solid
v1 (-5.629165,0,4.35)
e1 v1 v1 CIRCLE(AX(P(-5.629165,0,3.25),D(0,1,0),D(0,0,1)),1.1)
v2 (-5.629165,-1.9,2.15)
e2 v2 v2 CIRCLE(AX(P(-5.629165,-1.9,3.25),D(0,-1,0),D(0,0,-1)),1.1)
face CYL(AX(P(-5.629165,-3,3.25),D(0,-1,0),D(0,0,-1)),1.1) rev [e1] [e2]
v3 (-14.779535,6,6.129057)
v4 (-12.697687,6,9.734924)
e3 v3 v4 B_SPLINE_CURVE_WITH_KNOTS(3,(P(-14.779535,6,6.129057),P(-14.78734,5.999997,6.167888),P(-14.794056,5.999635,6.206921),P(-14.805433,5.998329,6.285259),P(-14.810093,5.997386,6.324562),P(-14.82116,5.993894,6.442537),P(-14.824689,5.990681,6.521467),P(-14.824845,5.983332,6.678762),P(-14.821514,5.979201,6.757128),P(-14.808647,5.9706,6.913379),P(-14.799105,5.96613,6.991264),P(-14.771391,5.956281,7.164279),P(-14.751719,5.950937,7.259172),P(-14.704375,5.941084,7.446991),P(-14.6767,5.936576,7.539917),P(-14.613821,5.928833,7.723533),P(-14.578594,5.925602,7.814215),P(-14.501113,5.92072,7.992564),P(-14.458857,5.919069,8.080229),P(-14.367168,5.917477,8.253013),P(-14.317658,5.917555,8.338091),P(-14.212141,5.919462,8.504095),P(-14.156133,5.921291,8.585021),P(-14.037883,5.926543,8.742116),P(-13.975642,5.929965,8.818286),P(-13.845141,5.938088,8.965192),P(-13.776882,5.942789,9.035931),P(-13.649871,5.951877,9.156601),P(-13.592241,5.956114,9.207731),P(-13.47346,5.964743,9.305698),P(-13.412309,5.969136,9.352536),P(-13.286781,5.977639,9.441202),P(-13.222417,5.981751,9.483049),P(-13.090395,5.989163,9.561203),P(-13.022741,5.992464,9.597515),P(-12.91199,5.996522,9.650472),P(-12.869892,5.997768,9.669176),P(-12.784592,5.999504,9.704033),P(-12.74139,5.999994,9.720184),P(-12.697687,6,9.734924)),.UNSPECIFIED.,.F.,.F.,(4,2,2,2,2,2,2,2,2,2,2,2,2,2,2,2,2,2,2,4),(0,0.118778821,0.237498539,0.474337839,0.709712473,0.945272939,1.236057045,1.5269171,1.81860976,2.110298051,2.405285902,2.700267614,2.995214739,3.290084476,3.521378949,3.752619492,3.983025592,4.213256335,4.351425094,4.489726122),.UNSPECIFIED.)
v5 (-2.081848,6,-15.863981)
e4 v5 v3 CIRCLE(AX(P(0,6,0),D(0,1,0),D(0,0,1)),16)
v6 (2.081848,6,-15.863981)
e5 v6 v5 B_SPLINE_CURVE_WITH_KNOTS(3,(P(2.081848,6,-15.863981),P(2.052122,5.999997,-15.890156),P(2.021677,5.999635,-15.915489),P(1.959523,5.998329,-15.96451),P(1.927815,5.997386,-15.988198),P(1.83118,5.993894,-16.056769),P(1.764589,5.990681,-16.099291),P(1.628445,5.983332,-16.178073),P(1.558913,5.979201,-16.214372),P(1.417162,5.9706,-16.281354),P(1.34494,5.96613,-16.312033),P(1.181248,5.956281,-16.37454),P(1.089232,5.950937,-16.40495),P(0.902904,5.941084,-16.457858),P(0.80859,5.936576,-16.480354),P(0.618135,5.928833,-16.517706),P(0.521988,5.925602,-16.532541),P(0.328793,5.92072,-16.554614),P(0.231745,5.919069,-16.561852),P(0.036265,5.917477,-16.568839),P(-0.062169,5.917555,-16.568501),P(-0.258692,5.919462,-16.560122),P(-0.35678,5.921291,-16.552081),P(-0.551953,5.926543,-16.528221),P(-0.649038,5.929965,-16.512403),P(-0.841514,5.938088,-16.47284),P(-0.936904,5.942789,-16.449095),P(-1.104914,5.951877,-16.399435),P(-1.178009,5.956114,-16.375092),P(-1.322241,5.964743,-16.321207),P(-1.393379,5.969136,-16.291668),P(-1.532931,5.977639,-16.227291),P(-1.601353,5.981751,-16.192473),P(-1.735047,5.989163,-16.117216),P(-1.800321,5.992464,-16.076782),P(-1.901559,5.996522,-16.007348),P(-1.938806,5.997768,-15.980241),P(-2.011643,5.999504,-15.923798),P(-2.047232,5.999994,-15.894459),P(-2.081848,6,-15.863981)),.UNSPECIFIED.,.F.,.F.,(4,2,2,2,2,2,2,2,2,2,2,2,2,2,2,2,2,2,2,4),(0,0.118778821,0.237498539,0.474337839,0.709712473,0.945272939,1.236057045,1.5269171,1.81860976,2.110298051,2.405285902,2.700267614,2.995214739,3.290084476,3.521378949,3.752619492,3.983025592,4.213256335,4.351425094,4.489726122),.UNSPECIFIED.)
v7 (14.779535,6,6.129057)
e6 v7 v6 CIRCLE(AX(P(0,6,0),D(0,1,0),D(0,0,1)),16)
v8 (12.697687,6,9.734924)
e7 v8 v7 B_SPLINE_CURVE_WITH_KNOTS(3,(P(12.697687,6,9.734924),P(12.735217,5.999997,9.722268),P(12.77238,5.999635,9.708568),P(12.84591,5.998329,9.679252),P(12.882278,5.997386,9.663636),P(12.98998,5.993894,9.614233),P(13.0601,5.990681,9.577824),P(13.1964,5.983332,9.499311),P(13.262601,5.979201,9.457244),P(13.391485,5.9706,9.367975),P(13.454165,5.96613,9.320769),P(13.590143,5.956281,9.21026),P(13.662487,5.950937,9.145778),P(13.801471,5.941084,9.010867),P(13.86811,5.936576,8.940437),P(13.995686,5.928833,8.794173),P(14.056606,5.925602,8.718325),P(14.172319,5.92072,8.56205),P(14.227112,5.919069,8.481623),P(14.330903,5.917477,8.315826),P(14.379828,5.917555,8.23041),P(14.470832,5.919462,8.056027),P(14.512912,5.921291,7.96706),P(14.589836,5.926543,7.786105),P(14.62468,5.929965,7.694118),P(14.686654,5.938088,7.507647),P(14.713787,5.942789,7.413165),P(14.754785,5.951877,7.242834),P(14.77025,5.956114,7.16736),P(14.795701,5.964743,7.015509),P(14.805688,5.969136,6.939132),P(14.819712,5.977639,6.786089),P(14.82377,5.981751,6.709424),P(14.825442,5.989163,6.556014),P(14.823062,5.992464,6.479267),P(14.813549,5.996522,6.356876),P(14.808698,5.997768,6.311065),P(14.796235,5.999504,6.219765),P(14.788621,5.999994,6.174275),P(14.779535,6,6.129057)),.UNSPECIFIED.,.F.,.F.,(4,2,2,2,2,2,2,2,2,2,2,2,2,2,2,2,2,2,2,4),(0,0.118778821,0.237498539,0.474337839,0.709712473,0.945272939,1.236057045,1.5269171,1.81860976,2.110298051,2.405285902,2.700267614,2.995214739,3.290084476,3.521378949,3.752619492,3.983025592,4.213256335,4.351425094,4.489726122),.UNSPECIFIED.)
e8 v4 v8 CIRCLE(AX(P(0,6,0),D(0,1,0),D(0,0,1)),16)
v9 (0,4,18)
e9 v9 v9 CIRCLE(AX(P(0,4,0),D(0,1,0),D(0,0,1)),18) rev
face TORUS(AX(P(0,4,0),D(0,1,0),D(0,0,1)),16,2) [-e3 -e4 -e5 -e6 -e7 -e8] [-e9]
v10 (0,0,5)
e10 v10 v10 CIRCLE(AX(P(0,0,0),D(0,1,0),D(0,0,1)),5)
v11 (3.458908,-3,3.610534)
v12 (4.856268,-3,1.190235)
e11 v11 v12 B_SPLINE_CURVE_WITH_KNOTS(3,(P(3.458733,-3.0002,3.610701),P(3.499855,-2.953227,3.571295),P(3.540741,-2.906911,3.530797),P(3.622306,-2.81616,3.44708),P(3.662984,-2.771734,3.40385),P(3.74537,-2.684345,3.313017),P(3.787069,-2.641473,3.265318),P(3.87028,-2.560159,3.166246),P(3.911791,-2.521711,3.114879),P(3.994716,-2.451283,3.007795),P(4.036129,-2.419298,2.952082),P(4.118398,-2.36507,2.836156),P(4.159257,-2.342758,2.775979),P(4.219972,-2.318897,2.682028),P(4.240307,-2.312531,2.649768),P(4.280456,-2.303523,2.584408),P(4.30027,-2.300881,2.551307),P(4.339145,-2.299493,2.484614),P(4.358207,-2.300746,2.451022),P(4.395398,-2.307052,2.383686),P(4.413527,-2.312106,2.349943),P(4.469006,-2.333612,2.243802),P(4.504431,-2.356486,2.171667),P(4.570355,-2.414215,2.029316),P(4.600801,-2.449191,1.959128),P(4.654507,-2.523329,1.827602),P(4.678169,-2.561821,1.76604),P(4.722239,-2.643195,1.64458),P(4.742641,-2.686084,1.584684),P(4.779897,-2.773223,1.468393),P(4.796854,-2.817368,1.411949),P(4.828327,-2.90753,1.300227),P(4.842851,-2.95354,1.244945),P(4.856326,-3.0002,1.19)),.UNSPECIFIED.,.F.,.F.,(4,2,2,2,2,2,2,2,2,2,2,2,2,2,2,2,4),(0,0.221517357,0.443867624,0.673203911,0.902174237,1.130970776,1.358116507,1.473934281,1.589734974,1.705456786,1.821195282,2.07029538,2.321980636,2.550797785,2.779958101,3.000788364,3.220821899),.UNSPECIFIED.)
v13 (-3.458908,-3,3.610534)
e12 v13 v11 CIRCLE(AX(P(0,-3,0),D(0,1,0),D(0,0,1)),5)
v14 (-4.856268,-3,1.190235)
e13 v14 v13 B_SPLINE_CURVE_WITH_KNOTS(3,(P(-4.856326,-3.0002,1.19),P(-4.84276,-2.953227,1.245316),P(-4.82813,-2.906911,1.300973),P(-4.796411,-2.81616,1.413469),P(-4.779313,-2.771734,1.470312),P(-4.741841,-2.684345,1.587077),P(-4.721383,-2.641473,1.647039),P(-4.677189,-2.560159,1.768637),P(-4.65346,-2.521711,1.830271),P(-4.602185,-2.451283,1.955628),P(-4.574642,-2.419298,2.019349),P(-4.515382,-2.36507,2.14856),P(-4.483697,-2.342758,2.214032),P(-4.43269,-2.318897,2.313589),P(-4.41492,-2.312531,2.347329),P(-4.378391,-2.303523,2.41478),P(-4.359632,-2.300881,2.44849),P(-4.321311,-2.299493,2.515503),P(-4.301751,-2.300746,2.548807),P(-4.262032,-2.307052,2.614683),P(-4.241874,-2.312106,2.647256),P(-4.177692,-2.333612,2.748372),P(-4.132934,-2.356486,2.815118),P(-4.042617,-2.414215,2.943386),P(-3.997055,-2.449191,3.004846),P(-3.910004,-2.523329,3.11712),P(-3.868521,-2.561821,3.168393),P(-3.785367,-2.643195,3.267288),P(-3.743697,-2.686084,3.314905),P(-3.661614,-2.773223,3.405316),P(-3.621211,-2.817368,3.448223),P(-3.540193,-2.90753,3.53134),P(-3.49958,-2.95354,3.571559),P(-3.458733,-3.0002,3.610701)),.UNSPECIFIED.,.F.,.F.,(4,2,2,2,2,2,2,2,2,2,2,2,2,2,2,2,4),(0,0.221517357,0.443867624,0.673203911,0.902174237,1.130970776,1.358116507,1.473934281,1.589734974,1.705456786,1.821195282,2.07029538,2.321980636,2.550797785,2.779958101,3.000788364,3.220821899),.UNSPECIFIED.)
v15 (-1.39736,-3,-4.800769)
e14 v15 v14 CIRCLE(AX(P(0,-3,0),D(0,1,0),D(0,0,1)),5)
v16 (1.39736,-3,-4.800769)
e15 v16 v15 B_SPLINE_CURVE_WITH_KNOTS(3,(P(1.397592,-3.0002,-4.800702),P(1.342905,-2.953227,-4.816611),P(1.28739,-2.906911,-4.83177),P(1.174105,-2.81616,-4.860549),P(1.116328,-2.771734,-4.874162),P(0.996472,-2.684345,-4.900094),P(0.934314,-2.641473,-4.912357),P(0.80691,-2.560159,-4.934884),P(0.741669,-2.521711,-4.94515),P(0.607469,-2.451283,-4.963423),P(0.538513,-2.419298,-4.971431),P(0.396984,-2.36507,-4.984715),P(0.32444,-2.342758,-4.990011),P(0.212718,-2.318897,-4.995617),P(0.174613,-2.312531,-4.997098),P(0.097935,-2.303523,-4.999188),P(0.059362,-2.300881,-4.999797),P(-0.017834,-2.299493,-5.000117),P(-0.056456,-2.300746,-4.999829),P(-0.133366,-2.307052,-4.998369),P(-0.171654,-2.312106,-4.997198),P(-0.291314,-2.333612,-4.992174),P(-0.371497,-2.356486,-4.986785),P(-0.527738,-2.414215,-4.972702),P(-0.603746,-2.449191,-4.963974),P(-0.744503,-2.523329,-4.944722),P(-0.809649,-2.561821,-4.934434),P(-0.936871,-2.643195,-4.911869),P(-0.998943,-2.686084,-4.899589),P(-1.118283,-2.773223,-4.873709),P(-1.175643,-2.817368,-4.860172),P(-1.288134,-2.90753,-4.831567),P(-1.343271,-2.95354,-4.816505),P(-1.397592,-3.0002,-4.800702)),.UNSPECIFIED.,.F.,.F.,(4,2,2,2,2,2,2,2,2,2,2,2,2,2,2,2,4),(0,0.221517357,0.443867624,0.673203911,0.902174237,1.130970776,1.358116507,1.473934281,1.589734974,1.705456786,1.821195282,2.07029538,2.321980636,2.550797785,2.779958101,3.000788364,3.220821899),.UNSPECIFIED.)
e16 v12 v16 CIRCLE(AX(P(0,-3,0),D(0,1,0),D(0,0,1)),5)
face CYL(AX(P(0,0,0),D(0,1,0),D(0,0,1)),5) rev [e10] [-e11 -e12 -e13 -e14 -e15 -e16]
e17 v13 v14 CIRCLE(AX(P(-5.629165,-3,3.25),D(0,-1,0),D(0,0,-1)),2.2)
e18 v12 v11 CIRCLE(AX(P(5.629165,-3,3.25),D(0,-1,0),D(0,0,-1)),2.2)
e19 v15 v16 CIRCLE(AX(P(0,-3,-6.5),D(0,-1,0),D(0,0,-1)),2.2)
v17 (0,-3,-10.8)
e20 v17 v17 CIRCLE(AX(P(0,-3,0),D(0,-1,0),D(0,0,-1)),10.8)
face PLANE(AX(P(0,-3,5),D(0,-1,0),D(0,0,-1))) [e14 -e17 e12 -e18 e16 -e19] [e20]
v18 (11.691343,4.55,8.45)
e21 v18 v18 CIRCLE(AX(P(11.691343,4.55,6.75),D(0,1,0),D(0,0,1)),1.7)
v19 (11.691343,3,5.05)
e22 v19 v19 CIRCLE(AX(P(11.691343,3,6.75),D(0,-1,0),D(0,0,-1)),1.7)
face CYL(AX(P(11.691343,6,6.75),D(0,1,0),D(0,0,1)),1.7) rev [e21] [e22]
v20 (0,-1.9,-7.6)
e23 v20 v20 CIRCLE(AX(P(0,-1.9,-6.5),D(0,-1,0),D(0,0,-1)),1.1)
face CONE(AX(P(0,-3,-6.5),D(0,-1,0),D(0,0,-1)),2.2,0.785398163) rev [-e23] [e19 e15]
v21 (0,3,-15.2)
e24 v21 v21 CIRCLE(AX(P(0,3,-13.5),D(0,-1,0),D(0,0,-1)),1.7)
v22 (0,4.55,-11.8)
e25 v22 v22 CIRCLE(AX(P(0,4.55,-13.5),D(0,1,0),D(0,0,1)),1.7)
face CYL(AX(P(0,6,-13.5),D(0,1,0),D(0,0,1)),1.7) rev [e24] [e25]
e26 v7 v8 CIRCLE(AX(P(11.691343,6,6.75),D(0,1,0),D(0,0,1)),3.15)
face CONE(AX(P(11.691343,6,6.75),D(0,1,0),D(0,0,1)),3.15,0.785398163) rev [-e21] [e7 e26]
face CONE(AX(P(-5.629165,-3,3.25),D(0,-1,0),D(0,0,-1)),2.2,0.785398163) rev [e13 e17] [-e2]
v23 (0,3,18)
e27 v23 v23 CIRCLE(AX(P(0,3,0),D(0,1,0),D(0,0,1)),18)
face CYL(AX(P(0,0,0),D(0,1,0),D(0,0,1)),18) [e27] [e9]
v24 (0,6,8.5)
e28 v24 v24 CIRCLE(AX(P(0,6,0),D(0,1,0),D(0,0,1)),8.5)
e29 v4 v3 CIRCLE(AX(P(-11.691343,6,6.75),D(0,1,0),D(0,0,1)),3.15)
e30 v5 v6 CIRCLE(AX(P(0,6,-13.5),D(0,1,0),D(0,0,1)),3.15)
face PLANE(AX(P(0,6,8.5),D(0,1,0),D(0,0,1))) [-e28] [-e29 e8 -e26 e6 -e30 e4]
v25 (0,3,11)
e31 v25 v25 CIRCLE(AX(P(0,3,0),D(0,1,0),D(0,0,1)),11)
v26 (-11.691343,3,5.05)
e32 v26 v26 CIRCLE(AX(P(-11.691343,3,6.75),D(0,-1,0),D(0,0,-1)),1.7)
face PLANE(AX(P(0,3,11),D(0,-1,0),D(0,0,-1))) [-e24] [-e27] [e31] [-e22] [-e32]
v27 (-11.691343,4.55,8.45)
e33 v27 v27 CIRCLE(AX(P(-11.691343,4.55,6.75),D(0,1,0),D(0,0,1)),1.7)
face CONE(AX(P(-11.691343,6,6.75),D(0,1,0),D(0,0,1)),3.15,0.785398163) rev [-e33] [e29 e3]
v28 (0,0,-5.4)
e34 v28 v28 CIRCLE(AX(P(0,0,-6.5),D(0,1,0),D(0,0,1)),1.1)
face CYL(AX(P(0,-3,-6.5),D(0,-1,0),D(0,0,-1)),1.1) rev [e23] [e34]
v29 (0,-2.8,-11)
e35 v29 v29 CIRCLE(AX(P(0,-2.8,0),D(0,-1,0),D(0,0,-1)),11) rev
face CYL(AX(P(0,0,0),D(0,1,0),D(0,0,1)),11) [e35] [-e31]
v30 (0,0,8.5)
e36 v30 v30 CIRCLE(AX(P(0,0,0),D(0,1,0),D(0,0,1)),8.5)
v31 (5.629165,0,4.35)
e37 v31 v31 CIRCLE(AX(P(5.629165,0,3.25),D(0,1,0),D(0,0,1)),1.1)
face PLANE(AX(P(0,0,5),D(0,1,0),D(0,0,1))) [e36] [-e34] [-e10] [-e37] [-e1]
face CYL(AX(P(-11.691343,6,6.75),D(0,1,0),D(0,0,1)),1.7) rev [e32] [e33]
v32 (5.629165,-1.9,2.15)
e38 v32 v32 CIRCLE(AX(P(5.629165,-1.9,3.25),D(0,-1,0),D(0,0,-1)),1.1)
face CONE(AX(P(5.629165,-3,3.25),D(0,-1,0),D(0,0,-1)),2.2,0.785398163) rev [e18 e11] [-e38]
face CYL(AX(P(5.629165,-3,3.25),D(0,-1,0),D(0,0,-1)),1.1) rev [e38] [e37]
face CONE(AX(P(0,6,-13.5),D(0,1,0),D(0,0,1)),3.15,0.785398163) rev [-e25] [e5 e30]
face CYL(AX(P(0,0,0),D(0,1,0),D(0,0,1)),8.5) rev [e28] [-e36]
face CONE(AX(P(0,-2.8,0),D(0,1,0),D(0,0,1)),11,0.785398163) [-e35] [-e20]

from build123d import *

# Parameters (mm, degrees)
CHANFREIN1_SIZE                                = 0.2
FRAISAGE_POUR_VIS_T_TE_FRAIS_E_M31_D           = 3.4
FRAISAGE_POUR_VIS_T_TE_FRAIS_E_M31_CSINK_D     = 6.3
FRAISAGE_POUR_VIS_T_TE_FRAIS_E_M31_CSINK_ANGLE = 90
CONG_1_R                                       = 2
FRAISAGE_POUR_VIS_T_TE_FRAIS_E_M22_D           = 2.2
FRAISAGE_POUR_VIS_T_TE_FRAIS_E_M22_CSINK_D     = 4.4
FRAISAGE_POUR_VIS_T_TE_FRAIS_E_M22_CSINK_ANGLE = 90


with BuildPart() as part:
    # Esquisse1 → Révolution1 (revolve)
    with BuildSketch(Plane(origin=(0, 0, 0), x_dir=(0, 0, -1), z_dir=(1, 0, 0))):
        Polygon((-5, -3), (-5, 0), (-8.5, 0), (-8.5, 6), (-18, 6), (-18, 3), (-11, 3), (-11, -3), align=None)
    revolve(axis=Axis((0, 0, 0), (0, -1, 0)))

    # Chanfrein1
    chanfrein1_edges = [part.edges().sort_by_distance(p)[0] for p in [
        (0, -3, -11),
    ]]
    chamfer(chanfrein1_edges, length=CHANFREIN1_SIZE)

    # Fraisage pour vis à tête fraisée M31 (through all)
    with Locations(Plane(origin=(0, 6, -13.5), x_dir=(0, 0, 1), z_dir=(0, 1, 0))):
        with Locations((0, 0), (20.25, 11.691342951), (20.25, -11.691342951)):
            CounterSinkHole(FRAISAGE_POUR_VIS_T_TE_FRAIS_E_M31_D / 2, FRAISAGE_POUR_VIS_T_TE_FRAIS_E_M31_CSINK_D / 2, counter_sink_angle=FRAISAGE_POUR_VIS_T_TE_FRAIS_E_M31_CSINK_ANGLE)

    # Congé1
    # the kernel refuses this fillet: 2 mm, written as the material it takes off along each edge
    with BuildSketch(Plane(origin=(0, 6, 0), x_dir=(0, 0, 1), z_dir=(1, 0, 0))) as cong_1_piece_1:
        with BuildLine():
            CenterArc((18 - CONG_1_R, CONG_1_R), CONG_1_R, 270, 90)
            Line((18, CONG_1_R), (18, 0))
            Line((18, 0), (18 - CONG_1_R, 0))
        make_face()
    revolve(axis=Axis((0, 6, 0), (0, -1, 0)), mode=Mode.SUBTRACT)

    # Fraisage pour vis à tête fraisée M22 (through all)
    with Locations(Plane(origin=(0, -3, 0), x_dir=(-1, 0, 0), z_dir=(0, -1, 0))):
        with Locations((0, 6.5), (-5.629165125, -3.25), (5.629165125, -3.25)):
            CounterSinkHole(FRAISAGE_POUR_VIS_T_TE_FRAIS_E_M22_D / 2, FRAISAGE_POUR_VIS_T_TE_FRAIS_E_M22_CSINK_D / 2, counter_sink_angle=FRAISAGE_POUR_VIS_T_TE_FRAIS_E_M22_CSINK_ANGLE)


solid = part.part
